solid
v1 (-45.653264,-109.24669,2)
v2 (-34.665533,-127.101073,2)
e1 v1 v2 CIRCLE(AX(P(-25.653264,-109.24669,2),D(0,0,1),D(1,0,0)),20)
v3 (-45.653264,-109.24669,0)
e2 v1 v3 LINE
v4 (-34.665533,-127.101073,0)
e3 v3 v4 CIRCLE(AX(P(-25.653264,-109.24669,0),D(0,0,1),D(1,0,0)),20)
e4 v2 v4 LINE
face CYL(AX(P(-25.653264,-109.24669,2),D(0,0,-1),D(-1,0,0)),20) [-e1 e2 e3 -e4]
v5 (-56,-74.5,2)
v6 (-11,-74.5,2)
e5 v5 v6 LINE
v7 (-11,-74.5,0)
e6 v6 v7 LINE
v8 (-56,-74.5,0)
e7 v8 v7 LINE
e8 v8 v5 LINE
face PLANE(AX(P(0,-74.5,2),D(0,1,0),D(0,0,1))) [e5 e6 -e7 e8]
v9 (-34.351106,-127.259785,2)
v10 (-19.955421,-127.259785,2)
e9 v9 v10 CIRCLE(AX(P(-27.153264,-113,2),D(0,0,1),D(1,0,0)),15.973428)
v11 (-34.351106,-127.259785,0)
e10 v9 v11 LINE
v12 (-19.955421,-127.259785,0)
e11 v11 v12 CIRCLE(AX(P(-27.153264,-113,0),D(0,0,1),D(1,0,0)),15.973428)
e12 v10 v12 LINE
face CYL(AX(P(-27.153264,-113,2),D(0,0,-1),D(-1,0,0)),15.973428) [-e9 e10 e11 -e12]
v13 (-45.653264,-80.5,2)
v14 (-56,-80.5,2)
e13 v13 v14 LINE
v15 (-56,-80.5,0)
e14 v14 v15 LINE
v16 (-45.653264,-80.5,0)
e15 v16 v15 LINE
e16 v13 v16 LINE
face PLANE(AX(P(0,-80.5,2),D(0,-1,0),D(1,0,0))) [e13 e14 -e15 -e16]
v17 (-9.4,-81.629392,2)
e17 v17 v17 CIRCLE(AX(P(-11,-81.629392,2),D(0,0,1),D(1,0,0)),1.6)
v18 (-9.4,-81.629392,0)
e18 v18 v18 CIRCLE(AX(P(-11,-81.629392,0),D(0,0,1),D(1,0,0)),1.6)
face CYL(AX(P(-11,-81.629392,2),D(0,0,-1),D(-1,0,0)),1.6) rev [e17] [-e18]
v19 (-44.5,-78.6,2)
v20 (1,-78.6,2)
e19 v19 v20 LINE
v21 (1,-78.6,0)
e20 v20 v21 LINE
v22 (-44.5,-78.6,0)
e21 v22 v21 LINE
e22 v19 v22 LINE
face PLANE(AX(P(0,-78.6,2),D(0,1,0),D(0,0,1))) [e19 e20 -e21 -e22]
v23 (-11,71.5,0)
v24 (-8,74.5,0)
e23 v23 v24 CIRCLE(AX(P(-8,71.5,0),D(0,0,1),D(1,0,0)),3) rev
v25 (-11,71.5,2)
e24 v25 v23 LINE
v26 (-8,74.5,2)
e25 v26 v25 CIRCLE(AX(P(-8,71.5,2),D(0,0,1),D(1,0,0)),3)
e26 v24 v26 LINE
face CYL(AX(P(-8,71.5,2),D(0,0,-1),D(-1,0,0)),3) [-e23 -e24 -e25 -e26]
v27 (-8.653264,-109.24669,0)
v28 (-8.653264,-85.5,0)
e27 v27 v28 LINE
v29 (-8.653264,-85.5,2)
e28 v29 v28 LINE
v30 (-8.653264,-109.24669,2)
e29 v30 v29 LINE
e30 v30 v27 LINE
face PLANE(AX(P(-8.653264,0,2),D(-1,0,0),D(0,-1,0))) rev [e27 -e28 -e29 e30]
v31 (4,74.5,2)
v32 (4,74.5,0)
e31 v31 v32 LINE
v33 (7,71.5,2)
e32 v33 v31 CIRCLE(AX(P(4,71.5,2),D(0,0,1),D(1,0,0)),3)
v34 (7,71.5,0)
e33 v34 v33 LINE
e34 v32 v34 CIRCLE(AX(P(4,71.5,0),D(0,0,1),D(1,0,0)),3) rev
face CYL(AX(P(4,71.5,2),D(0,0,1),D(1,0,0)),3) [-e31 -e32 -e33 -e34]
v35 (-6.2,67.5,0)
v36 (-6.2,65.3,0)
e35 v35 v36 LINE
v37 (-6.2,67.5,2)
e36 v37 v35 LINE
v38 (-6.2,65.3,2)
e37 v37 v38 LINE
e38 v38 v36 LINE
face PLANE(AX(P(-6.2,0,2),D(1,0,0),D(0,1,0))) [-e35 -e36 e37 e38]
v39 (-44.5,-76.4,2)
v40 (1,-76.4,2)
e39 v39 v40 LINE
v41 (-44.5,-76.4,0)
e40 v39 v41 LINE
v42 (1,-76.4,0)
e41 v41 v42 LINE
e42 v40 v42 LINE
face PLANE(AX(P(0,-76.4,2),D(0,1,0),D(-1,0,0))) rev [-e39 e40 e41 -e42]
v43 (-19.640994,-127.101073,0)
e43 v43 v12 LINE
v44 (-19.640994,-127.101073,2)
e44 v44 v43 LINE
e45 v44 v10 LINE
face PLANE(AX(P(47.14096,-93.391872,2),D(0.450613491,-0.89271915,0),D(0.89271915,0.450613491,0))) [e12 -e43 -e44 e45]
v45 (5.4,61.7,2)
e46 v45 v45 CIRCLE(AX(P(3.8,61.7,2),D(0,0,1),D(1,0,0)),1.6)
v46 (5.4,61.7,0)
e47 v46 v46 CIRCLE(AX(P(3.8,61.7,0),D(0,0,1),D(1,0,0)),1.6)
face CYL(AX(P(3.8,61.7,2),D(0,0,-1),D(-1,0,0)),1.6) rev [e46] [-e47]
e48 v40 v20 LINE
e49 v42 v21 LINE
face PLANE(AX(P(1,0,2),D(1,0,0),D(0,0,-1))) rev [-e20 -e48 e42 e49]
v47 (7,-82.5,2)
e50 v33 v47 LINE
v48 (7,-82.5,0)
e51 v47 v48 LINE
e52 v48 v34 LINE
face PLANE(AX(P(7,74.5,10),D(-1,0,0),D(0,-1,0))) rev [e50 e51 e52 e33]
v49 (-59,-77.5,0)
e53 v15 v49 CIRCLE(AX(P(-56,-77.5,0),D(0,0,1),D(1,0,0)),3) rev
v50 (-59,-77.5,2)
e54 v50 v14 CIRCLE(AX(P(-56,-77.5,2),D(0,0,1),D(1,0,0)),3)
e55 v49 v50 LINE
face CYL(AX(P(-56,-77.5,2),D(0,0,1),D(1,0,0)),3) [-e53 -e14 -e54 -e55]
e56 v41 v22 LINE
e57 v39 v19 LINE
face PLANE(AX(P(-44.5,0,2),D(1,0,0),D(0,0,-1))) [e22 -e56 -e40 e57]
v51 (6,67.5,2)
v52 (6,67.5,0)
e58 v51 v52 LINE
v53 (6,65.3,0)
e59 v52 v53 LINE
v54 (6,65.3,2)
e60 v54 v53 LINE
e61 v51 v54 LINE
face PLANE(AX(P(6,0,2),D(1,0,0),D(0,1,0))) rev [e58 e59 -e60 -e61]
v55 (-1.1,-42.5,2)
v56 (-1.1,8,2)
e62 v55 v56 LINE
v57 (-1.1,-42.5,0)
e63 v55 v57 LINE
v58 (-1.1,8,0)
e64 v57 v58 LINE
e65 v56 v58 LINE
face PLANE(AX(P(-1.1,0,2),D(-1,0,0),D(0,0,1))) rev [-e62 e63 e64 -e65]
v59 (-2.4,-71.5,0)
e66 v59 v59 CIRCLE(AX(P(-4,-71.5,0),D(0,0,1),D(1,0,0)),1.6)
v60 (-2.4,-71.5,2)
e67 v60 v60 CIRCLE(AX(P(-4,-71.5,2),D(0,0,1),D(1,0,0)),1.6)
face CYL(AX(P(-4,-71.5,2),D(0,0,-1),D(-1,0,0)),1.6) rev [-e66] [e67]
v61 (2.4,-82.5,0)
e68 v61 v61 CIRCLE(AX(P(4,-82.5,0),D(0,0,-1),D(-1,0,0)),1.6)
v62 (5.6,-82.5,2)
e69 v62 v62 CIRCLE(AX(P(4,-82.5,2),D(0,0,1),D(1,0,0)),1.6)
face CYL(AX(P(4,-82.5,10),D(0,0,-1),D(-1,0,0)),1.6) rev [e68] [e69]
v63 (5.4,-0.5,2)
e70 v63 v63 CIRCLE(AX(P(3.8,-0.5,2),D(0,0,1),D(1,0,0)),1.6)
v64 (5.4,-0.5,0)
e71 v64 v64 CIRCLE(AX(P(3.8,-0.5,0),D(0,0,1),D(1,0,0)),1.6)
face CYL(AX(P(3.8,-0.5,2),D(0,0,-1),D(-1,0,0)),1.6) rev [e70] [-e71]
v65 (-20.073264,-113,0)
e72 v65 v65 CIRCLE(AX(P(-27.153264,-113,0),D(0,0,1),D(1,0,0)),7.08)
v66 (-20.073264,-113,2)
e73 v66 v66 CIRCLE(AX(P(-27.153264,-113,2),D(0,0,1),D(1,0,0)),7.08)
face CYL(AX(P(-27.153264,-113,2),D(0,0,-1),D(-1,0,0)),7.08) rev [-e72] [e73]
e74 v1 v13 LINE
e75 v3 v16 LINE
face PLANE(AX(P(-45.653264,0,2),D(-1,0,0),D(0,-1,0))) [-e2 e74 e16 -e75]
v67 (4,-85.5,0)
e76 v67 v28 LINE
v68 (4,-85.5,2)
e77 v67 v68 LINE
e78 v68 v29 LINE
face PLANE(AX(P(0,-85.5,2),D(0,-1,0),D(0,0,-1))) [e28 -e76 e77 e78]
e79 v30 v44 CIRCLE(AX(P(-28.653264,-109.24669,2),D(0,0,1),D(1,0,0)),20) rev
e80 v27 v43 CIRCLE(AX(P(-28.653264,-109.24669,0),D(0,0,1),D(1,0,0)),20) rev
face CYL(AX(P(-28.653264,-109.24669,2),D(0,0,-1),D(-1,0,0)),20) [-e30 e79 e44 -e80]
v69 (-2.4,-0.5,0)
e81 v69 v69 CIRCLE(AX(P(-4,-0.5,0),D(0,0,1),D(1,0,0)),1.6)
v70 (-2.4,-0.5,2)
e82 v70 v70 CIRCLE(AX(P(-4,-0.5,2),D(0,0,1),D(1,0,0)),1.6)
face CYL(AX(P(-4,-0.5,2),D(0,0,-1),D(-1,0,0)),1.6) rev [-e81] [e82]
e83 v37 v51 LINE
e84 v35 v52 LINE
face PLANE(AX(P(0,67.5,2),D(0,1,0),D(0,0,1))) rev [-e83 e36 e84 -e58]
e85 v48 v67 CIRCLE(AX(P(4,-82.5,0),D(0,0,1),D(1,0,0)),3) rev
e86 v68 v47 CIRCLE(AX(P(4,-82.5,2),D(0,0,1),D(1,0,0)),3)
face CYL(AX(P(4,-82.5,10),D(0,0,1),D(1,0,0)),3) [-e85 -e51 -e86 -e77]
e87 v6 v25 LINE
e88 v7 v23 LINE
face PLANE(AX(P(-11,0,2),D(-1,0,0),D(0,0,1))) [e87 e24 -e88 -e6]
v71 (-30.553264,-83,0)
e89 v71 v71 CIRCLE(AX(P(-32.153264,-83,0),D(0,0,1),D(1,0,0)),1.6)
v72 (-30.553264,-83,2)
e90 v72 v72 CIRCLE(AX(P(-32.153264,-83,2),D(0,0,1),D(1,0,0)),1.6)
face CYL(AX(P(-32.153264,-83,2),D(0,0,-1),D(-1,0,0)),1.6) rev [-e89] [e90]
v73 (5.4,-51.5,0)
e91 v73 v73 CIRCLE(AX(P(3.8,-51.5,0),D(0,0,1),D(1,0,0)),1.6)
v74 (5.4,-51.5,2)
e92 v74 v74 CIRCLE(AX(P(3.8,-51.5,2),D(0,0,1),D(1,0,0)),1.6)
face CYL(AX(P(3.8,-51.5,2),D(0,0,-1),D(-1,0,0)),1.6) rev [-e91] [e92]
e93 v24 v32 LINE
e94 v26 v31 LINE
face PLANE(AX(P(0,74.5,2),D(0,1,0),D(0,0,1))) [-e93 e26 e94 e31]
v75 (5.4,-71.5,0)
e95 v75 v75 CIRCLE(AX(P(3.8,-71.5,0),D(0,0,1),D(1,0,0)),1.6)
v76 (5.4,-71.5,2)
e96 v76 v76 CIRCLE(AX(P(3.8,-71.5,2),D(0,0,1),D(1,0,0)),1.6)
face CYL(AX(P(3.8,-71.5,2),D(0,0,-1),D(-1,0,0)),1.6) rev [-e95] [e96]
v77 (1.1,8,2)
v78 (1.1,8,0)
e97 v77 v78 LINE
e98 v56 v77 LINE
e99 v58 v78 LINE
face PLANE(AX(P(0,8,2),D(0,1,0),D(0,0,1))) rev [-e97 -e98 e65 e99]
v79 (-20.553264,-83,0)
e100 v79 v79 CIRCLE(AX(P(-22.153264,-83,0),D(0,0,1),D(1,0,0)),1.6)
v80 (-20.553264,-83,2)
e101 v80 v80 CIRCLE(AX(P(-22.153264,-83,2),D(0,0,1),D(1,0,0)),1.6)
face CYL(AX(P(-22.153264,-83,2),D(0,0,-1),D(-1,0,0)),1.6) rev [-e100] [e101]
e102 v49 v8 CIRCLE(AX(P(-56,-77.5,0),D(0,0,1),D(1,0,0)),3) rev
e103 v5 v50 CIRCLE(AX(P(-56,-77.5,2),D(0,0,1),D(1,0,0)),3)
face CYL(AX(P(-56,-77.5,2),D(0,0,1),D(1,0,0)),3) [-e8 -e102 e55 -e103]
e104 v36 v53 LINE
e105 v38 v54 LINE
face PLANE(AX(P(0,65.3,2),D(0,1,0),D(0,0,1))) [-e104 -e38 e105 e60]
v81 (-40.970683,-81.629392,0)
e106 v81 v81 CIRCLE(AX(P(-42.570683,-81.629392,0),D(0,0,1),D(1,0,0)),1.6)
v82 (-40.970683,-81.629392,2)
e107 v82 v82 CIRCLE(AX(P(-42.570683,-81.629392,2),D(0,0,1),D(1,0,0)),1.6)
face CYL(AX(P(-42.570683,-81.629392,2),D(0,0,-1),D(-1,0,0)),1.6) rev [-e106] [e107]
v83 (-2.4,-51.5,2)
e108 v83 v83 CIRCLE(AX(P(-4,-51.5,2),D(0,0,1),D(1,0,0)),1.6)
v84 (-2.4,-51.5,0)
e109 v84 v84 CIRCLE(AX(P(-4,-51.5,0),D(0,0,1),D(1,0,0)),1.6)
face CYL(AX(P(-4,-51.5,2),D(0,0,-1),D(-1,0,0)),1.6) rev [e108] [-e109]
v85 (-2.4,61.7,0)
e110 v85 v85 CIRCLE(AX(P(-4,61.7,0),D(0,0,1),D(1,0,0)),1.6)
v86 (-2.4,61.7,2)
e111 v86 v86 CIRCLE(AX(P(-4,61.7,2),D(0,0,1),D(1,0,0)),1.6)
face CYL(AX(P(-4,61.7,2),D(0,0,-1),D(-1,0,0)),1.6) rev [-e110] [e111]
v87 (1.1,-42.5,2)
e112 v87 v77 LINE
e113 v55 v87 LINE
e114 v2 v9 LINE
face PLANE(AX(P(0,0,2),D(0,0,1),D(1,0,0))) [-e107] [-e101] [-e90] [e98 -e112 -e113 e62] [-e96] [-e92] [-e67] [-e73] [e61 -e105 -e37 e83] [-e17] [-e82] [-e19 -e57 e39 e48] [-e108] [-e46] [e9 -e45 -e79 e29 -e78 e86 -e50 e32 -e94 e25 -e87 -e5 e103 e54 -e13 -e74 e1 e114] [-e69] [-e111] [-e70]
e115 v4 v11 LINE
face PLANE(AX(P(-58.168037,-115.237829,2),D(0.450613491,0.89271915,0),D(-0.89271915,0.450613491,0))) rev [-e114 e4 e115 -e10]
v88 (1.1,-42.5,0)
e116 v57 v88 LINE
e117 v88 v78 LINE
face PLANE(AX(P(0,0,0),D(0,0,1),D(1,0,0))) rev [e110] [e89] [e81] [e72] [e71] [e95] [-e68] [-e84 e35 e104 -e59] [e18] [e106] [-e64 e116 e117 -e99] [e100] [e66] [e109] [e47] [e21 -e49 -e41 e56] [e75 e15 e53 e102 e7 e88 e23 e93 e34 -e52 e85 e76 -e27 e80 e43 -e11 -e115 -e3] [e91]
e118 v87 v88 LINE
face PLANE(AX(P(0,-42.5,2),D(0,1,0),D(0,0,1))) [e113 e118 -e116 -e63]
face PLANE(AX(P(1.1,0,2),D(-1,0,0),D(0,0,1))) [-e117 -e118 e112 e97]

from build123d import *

# Parameters (mm, degrees)
SKETCH_1_R          = 1.6
SKETCH_1_R_2        = 7.08
SKETCH_1_W          = 45.5
SKETCH_1_H          = 2.2
SKETCH_1_W_2        = 2.2
SKETCH_1_H_2        = 50.5
SKETCH_1_W_3        = 12.2
EXTRUDE_1_DEPTH     = 2
SKETCH_2_W          = 4
SKETCH_2_H          = 160
CUT_EXTRUDE_1_DEPTH = 10
SKETCH_3_R          = 1.6
CUT_EXTRUDE_2_DEPTH = 10
FILLET_1_R          = 3


with BuildPart() as part:
    # 草图1 → 凸台-拉伸1 (new body)
    with BuildSketch(Plane.XY):
        with BuildLine():
            Line((-8.65326359, -109.246690295), (-8.65326359, -85.5))
            Line((-8.65326359, -85.5), (11, -85.5))
            Line((11, -85.5), (11, 74.5))
            Line((11, 74.5), (-11, 74.5))
            Line((-11, 74.5), (-11, -74.5))
            Line((-11, -74.5), (-59, -74.5))
            Line((-59, -74.5), (-59, -80.5))
            Line((-59, -80.5), (-45.65326359, -80.5))
            Line((-45.65326359, -80.5), (-45.65326359, -109.246690295))
            ThreePointArc((-45.65326359, -109.246690295), (-42.686252119, -119.728927736), (-34.665533413, -127.101073304))
            Line((-34.665533413, -127.101073304), (-34.351105887, -127.259785353))
            ThreePointArc((-34.351105887, -127.259785353), (-27.15326359, -128.973428312), (-19.955421292, -127.259785353))
            Line((-19.955421292, -127.259785353), (-19.640993767, -127.101073304))
            ThreePointArc((-19.640993767, -127.101073304), (-11.620275061, -119.728927736), (-8.65326359, -109.246690295))
        make_face()
        with Locations((-11, -81.629391896)):
            Circle(SKETCH_1_R, mode=Mode.SUBTRACT)
        with Locations((-42.570682945, -81.629391896)):
            Circle(SKETCH_1_R, mode=Mode.SUBTRACT)
        with Locations((-22.15326359, -83)):
            Circle(SKETCH_1_R, mode=Mode.SUBTRACT)
        with Locations((-27.15326359, -113)):
            Circle(SKETCH_1_R_2, mode=Mode.SUBTRACT)
        with Locations((-32.15326359, -83)):
            Circle(SKETCH_1_R, mode=Mode.SUBTRACT)
        with Locations((-21.75, -77.5)):
            Rectangle(SKETCH_1_W, SKETCH_1_H, mode=Mode.SUBTRACT)
        with Locations((3.8, 61.7)):
            Circle(SKETCH_1_R, mode=Mode.SUBTRACT)
        with Locations((-4, -71.5)):
            Circle(SKETCH_1_R, mode=Mode.SUBTRACT)
        with Locations((3.8, -71.5)):
            Circle(SKETCH_1_R, mode=Mode.SUBTRACT)
        with Locations((-4, -51.5)):
            Circle(SKETCH_1_R, mode=Mode.SUBTRACT)
        with Locations((3.8, -51.5)):
            Circle(SKETCH_1_R, mode=Mode.SUBTRACT)
        with Locations((0, -17.25)):
            Rectangle(SKETCH_1_W_2, SKETCH_1_H_2, mode=Mode.SUBTRACT)
        with Locations((-4, -0.5)):
            Circle(SKETCH_1_R, mode=Mode.SUBTRACT)
        with Locations((3.8, -0.5)):
            Circle(SKETCH_1_R, mode=Mode.SUBTRACT)
        with Locations((-4, 61.7)):
            Circle(SKETCH_1_R, mode=Mode.SUBTRACT)
        with Locations((-0.1, 66.4)):
            Rectangle(SKETCH_1_W_3, SKETCH_1_H, mode=Mode.SUBTRACT)
    extrude(amount=EXTRUDE_1_DEPTH)

    # 草图2 → 切除-拉伸1 (cut)
    with BuildSketch(Plane(origin=(0, 0, 0), x_dir=(-1, 0, 0), z_dir=(0, 0, -1))):
        with Locations((-9, -5.5)):
            Rectangle(SKETCH_2_W, SKETCH_2_H)
    extrude(amount=-CUT_EXTRUDE_1_DEPTH, mode=Mode.SUBTRACT)

    # 草图3 → 切除-拉伸2 (cut)
    with BuildSketch(Plane(origin=(0, 0, 0), x_dir=(-1, 0, 0), z_dir=(0, 0, -1))):
        with Locations((-4, -82.5)):
            Circle(SKETCH_3_R)
    extrude(amount=-CUT_EXTRUDE_2_DEPTH, mode=Mode.SUBTRACT)

    # 圆角1
    fillet_1_edges = [part.edges().sort_by_distance(p)[0] for p in [
        (-59, -74.5, 1),
        (-59, -80.5, 1),
        (7, -85.5, 1),
        (-11, 74.5, 1),
        (7, 74.5, 1),
    ]]
    fillet(fillet_1_edges, radius=FILLET_1_R - 0.0001)  # a hair under: the kernel refuses the full size


solid = part.part
